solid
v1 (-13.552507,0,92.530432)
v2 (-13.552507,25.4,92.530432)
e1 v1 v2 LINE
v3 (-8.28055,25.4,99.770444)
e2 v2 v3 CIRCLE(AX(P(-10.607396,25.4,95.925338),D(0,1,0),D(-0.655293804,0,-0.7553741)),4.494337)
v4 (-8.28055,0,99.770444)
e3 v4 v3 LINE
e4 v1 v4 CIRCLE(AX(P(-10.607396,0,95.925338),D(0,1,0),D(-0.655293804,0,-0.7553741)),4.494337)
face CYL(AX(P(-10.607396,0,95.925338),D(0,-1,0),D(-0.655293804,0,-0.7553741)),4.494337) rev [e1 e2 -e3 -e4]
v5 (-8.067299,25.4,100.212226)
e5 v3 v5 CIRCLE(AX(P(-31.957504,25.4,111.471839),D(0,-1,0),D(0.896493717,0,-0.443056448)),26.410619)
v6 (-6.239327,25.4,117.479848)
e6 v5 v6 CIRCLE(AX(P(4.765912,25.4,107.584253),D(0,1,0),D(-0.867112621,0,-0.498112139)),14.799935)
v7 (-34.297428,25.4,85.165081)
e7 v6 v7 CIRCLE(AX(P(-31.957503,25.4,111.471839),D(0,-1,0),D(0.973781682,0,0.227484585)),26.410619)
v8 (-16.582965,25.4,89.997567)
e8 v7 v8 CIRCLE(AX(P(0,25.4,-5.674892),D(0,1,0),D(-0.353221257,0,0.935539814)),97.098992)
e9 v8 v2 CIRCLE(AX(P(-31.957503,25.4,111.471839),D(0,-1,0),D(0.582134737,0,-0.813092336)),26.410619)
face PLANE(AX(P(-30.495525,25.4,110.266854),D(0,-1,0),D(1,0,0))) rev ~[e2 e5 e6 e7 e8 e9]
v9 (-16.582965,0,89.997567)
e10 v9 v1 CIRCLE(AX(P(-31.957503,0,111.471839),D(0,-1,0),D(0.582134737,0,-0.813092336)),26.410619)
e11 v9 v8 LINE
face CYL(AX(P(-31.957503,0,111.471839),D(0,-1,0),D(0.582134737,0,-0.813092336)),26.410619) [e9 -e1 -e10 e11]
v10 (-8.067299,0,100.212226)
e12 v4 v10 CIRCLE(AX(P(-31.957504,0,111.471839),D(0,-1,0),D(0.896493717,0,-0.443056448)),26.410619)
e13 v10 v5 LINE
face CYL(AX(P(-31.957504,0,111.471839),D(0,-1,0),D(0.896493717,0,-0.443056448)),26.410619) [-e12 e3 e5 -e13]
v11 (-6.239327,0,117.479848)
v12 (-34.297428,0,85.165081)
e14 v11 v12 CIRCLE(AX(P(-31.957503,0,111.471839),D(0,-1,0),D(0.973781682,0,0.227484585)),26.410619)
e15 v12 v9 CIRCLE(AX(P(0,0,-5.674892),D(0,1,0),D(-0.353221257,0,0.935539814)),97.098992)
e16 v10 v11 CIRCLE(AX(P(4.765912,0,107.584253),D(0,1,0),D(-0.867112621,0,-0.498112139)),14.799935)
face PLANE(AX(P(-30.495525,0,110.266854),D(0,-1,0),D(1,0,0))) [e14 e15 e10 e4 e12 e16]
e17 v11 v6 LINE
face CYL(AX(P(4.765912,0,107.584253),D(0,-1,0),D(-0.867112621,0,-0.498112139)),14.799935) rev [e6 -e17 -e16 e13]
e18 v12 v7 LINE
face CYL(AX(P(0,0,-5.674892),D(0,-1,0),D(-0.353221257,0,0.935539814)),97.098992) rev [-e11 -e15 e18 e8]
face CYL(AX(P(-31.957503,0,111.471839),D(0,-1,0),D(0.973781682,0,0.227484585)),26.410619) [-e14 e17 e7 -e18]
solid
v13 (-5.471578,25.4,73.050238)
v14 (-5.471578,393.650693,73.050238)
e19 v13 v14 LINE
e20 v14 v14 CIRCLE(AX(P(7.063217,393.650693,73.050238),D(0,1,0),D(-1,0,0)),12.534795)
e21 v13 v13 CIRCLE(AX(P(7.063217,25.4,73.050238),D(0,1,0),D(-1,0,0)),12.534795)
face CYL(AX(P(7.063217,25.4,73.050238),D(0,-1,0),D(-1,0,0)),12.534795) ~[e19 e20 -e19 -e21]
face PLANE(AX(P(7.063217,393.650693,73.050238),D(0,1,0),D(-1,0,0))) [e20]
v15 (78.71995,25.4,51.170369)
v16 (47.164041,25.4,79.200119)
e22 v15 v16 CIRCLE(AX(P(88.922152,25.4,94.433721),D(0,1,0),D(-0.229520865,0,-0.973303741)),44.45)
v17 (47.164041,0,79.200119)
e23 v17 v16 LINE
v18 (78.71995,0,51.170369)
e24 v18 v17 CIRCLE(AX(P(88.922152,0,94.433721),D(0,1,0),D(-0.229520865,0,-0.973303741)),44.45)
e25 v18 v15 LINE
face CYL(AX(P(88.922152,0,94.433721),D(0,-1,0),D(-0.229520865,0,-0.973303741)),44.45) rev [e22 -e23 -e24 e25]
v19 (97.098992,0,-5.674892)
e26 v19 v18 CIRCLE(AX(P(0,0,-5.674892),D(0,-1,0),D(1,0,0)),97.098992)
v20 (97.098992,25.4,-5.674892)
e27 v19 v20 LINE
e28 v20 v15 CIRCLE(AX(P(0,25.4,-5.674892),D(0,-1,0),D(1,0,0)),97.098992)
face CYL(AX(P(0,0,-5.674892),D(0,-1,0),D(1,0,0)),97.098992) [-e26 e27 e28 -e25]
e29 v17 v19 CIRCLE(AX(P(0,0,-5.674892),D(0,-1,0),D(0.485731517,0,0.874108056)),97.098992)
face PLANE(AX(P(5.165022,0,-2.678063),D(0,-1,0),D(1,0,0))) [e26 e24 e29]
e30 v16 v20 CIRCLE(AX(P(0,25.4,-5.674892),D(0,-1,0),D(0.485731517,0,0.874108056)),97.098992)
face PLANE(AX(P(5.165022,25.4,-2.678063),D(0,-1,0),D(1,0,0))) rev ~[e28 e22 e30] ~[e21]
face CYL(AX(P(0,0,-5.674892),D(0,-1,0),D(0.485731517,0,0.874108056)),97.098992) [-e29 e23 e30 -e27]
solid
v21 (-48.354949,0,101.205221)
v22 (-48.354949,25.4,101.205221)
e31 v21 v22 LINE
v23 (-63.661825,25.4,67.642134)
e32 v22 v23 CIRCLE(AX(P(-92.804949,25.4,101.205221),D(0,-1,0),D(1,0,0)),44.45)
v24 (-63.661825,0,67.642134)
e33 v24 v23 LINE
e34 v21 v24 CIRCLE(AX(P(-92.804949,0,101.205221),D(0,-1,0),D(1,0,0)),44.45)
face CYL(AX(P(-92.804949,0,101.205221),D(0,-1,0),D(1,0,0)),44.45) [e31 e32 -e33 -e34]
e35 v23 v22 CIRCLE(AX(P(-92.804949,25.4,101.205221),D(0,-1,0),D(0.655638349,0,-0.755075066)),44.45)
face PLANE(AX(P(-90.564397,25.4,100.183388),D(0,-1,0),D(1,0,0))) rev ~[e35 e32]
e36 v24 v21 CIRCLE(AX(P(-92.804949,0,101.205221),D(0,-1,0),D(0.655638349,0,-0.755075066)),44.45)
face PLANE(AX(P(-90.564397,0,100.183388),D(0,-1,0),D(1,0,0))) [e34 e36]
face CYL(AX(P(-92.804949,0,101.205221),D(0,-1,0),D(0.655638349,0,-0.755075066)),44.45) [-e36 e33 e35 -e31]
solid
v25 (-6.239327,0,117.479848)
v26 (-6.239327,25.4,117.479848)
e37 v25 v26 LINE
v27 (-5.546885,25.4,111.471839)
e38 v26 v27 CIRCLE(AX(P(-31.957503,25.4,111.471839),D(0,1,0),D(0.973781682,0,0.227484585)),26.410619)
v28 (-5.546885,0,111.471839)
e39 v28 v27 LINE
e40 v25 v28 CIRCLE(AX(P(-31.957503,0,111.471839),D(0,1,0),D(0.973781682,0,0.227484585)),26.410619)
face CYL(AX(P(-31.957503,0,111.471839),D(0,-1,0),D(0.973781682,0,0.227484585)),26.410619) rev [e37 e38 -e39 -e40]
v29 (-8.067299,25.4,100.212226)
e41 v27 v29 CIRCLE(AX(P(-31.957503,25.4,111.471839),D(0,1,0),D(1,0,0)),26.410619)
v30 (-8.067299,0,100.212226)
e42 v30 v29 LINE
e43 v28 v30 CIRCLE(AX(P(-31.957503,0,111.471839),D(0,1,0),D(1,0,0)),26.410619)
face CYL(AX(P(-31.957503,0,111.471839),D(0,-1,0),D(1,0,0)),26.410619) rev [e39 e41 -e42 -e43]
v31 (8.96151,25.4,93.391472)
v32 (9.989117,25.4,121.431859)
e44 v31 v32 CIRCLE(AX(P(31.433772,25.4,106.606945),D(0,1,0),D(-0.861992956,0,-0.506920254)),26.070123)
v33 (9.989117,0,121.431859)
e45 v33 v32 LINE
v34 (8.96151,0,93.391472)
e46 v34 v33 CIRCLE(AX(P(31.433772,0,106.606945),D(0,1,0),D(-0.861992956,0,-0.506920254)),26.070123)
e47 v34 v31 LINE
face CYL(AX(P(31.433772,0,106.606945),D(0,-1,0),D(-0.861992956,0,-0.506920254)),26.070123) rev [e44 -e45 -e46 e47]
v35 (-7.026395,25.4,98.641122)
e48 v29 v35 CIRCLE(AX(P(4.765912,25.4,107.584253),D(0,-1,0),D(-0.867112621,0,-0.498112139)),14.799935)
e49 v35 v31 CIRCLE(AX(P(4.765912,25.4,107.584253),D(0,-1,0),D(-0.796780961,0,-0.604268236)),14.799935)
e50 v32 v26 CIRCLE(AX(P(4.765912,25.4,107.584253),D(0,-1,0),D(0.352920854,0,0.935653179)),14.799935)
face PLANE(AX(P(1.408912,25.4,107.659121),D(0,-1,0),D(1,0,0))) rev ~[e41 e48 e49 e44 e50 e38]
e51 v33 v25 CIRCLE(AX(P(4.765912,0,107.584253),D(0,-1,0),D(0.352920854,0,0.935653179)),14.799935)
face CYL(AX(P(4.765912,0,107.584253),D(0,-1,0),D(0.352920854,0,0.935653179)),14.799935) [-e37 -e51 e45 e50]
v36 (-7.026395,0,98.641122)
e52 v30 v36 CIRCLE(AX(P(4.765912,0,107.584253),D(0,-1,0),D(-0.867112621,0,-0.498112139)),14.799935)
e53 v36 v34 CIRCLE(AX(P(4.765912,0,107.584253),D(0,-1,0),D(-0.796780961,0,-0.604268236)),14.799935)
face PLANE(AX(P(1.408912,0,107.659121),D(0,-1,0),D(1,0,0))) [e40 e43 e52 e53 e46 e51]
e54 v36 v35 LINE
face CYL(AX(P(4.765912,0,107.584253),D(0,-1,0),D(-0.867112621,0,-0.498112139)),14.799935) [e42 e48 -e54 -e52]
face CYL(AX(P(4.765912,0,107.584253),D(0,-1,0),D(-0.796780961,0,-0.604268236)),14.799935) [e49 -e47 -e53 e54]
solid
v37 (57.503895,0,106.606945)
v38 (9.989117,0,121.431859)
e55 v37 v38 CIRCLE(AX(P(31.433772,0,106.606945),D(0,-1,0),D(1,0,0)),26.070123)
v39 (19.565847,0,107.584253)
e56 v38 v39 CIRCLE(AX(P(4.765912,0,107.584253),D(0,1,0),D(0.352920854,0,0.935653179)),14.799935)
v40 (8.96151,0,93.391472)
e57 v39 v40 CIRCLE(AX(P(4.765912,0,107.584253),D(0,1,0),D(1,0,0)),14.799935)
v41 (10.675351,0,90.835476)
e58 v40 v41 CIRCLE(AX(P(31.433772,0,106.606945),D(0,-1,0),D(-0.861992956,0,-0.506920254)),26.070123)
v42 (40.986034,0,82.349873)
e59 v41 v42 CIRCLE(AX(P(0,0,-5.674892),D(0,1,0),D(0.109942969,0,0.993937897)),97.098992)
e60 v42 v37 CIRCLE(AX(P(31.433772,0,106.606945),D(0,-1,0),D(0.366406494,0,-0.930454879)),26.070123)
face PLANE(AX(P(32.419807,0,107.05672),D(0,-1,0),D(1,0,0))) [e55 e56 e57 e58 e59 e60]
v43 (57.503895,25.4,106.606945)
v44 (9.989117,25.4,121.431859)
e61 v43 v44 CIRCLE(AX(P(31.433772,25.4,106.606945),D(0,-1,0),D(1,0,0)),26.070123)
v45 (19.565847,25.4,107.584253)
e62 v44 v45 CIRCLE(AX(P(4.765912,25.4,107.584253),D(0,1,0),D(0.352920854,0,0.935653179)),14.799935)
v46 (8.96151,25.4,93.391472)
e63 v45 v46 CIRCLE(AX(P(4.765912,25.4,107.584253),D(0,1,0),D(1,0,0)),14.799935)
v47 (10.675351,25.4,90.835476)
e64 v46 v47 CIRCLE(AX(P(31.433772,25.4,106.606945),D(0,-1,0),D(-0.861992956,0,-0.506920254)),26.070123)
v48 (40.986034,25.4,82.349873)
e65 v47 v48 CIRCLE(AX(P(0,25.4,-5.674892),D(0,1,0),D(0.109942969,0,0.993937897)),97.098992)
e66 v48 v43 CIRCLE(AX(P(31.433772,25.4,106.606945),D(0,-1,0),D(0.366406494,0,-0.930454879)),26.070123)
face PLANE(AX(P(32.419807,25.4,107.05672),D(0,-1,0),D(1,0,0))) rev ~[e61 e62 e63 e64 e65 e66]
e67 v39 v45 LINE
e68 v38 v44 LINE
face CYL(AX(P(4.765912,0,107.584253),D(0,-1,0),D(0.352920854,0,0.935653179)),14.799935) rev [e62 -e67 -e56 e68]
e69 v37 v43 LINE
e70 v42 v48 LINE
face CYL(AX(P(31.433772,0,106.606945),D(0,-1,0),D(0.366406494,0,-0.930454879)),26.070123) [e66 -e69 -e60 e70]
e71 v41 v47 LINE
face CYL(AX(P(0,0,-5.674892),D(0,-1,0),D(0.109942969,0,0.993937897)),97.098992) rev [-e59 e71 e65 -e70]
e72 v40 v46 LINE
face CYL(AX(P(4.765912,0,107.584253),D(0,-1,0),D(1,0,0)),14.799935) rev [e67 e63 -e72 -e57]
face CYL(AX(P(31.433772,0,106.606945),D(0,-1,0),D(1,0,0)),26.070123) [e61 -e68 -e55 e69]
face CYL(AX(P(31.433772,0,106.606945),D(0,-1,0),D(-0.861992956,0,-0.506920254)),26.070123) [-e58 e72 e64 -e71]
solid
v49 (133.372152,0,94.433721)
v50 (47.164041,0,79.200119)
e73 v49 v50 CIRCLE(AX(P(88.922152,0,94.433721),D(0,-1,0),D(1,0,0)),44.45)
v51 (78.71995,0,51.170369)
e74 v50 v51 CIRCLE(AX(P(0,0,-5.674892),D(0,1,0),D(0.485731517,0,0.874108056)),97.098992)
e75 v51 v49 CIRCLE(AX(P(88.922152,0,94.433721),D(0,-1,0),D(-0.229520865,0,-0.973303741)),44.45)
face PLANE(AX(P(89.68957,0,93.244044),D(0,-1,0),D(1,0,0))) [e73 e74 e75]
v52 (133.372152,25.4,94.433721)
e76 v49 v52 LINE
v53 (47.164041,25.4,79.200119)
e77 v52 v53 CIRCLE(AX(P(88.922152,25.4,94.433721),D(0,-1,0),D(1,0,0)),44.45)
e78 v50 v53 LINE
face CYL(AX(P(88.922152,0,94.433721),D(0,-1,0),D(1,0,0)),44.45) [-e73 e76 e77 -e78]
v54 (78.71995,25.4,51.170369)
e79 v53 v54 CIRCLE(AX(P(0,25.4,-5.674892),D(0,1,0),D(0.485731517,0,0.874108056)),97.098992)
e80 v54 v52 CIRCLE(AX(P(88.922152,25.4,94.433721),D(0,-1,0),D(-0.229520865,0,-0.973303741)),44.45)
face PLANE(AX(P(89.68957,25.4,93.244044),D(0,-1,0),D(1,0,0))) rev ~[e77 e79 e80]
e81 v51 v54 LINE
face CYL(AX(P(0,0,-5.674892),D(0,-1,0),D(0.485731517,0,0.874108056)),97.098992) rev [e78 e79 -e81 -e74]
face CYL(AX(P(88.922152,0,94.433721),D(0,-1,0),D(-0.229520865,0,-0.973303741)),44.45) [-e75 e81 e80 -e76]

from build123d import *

# Parameters (mm, degrees)
F2_DEPTH = 25.4
F3_R     = 12.5347954463
F4_DEPTH = 368.2506931


# Not quite as in the source:
# - an extrude ends at something that could not be found from the text; its depth is read off the source's solid


with BuildPart() as f2:
    # F1 (on face) → F2 (new body)
    with BuildSketch(Plane.XZ):
        with BuildLine():
            ThreePointArc((8.9615103374, 93.3914722681), (5.3811386715, 107.5617064877), (9.9891173988, 121.4318590159))
            ThreePointArc((9.9891173988, 121.4318590159), (1.2641159909, 121.9639433995), (-6.2393266144, 117.4798479024))
            ThreePointArc((-6.2393266144, 117.4798479024), (-5.7205661899, 114.4957292899), (-5.5468846049, 111.4718392491))
            ThreePointArc((-5.5468846049, 111.4718392491), (-6.1846894375, 105.7027105797), (-8.0672985226, 100.2122257523))
            ThreePointArc((-8.0672985226, 100.2122257523), (-7.5718801063, 99.4100885879), (-7.0263945394, 98.6411224418))
            ThreePointArc((-7.0263945394, 98.6411224418), (0.1488565511, 93.5229275418), (8.9615103374, 93.3914722681))
        make_face()
    extrude(amount=-F2_DEPTH)


with BuildPart() as f2b:
    # F1 (on face) → F2, piece 2 (new body)
    with BuildSketch(Plane.XZ):
        with BuildLine():
            ThreePointArc((-8.0672985226, 100.2122257523), (-9.9517851493, 109.1422866074), (-6.2393266144, 117.4798479024))
            ThreePointArc((-6.2393266144, 117.4798479024), (-51.8998380867, 128.7872680092), (-34.2974279466, 85.1650808261))
            ThreePointArc((-34.2974279466, 85.1650808261), (-25.5546829871, 88.0009981982), (-16.5829647685, 89.9975674992))
            ThreePointArc((-16.5829647685, 89.9975674992), (-15.0203225596, 91.2072718845), (-13.5525071705, 92.5304322511))
            ThreePointArc((-13.5525071705, 92.5304322511), (-14.2405775832, 98.5709102582), (-8.2805496008, 99.7704442906))
            ThreePointArc((-8.2805496008, 99.7704442906), (-8.1728983191, 99.9908398881), (-8.0672985226, 100.2122257523))
        make_face()
    extrude(amount=-F2_DEPTH)


with BuildPart() as f2c:
    # F1 (on face) → F2, piece 3 (new body)
    with BuildSketch(Plane.XZ):
        with BuildLine():
            ThreePointArc((9.9891173988, 121.4318590159), (16.9384458795, 116.0025356672), (19.5658465826, 107.5842529502))
            ThreePointArc((19.5658465826, 107.5842529502), (16.6219789041, 98.7258251736), (8.9615103374, 93.3914722681))
            ThreePointArc((8.9615103374, 93.3914722681), (9.7806833027, 92.088163609), (10.6753514703, 90.8354758274))
            ThreePointArc((10.6753514703, 90.8354758274), (26.1768230416, 87.8290553094), (40.9860344784, 82.3498727218))
            ThreePointArc((40.9860344784, 82.3498727218), (52.9823213515, 91.9334549759), (57.5038948022, 106.6069453955))
            ThreePointArc((57.5038948022, 106.6069453955), (39.1986453542, 131.493850263), (9.9891173988, 121.4318590159))
        make_face()
    extrude(amount=-F2_DEPTH)


with BuildPart() as f2d:
    # F0 (on Front) → F2, piece 4 (new body)
    with BuildSketch(Plane.XZ):
        with BuildLine():
            ThreePointArc((-48.3549493189, 101.2052206791), (-133.2475901104, 119.6496048056), (-63.6618247207, 67.6421339817))
            ThreePointArc((-63.6618247207, 67.6421339817), (-52.3623085273, 82.7608365526), (-48.3549493189, 101.2052206791))
        make_face()
    extrude(amount=-F2_DEPTH)


with BuildPart() as f2e:
    # F0 (on Front) → F2, piece 5 (new body)
    with BuildSketch(Plane.XZ):
        with BuildLine():
            ThreePointArc((-63.6618247207, 67.6421339817), (-40.2909122509, -94.019991492), (97.0989918611, -5.674891965))
            ThreePointArc((97.0989918611, -5.674891965), (92.3900481259, 24.1963856734), (78.7199498001, 51.1703692615))
            ThreePointArc((78.7199498001, 51.1703692616), (59.4029165337, 61.2009472273), (47.1640406419, 79.2001190263))
            ThreePointArc((47.1640406419, 79.2001190263), (-10.071791025, 90.9003286974), (-63.6618247207, 67.6421339817))
        make_face()
    extrude(amount=-F2_DEPTH)

    # F3 (on face) → F4 (join, through all)
    with BuildSketch(Plane(origin=(0, 25.4, 0), x_dir=(-1, 0, 0), z_dir=(0, 1, 0))):
        with Locations((-7.0632169954, 73.0502381921)):
            Circle(F3_R)
    extrude(amount=F4_DEPTH)


with BuildPart() as f2f:
    # F0 (on Front) → F2, piece 6 (new body)
    with BuildSketch(Plane.XZ):
        with BuildLine():
            ThreePointArc((47.1640406419, 79.2001190263), (64.4834201975, 66.9205813104), (78.7199498001, 51.1703692615))
            ThreePointArc((78.7199498001, 51.1703692616), (116.5112316164, 59.5819602105), (133.3721522419, 94.4337205573))
            ThreePointArc((133.3721522419, 94.4337205573), (81.1873465112, 138.205575445), (47.1640406419, 79.2001190263))
        make_face()
    extrude(amount=-F2_DEPTH)


solid = Compound([f2.part, f2b.part, f2c.part, f2d.part, f2e.part, f2f.part])
